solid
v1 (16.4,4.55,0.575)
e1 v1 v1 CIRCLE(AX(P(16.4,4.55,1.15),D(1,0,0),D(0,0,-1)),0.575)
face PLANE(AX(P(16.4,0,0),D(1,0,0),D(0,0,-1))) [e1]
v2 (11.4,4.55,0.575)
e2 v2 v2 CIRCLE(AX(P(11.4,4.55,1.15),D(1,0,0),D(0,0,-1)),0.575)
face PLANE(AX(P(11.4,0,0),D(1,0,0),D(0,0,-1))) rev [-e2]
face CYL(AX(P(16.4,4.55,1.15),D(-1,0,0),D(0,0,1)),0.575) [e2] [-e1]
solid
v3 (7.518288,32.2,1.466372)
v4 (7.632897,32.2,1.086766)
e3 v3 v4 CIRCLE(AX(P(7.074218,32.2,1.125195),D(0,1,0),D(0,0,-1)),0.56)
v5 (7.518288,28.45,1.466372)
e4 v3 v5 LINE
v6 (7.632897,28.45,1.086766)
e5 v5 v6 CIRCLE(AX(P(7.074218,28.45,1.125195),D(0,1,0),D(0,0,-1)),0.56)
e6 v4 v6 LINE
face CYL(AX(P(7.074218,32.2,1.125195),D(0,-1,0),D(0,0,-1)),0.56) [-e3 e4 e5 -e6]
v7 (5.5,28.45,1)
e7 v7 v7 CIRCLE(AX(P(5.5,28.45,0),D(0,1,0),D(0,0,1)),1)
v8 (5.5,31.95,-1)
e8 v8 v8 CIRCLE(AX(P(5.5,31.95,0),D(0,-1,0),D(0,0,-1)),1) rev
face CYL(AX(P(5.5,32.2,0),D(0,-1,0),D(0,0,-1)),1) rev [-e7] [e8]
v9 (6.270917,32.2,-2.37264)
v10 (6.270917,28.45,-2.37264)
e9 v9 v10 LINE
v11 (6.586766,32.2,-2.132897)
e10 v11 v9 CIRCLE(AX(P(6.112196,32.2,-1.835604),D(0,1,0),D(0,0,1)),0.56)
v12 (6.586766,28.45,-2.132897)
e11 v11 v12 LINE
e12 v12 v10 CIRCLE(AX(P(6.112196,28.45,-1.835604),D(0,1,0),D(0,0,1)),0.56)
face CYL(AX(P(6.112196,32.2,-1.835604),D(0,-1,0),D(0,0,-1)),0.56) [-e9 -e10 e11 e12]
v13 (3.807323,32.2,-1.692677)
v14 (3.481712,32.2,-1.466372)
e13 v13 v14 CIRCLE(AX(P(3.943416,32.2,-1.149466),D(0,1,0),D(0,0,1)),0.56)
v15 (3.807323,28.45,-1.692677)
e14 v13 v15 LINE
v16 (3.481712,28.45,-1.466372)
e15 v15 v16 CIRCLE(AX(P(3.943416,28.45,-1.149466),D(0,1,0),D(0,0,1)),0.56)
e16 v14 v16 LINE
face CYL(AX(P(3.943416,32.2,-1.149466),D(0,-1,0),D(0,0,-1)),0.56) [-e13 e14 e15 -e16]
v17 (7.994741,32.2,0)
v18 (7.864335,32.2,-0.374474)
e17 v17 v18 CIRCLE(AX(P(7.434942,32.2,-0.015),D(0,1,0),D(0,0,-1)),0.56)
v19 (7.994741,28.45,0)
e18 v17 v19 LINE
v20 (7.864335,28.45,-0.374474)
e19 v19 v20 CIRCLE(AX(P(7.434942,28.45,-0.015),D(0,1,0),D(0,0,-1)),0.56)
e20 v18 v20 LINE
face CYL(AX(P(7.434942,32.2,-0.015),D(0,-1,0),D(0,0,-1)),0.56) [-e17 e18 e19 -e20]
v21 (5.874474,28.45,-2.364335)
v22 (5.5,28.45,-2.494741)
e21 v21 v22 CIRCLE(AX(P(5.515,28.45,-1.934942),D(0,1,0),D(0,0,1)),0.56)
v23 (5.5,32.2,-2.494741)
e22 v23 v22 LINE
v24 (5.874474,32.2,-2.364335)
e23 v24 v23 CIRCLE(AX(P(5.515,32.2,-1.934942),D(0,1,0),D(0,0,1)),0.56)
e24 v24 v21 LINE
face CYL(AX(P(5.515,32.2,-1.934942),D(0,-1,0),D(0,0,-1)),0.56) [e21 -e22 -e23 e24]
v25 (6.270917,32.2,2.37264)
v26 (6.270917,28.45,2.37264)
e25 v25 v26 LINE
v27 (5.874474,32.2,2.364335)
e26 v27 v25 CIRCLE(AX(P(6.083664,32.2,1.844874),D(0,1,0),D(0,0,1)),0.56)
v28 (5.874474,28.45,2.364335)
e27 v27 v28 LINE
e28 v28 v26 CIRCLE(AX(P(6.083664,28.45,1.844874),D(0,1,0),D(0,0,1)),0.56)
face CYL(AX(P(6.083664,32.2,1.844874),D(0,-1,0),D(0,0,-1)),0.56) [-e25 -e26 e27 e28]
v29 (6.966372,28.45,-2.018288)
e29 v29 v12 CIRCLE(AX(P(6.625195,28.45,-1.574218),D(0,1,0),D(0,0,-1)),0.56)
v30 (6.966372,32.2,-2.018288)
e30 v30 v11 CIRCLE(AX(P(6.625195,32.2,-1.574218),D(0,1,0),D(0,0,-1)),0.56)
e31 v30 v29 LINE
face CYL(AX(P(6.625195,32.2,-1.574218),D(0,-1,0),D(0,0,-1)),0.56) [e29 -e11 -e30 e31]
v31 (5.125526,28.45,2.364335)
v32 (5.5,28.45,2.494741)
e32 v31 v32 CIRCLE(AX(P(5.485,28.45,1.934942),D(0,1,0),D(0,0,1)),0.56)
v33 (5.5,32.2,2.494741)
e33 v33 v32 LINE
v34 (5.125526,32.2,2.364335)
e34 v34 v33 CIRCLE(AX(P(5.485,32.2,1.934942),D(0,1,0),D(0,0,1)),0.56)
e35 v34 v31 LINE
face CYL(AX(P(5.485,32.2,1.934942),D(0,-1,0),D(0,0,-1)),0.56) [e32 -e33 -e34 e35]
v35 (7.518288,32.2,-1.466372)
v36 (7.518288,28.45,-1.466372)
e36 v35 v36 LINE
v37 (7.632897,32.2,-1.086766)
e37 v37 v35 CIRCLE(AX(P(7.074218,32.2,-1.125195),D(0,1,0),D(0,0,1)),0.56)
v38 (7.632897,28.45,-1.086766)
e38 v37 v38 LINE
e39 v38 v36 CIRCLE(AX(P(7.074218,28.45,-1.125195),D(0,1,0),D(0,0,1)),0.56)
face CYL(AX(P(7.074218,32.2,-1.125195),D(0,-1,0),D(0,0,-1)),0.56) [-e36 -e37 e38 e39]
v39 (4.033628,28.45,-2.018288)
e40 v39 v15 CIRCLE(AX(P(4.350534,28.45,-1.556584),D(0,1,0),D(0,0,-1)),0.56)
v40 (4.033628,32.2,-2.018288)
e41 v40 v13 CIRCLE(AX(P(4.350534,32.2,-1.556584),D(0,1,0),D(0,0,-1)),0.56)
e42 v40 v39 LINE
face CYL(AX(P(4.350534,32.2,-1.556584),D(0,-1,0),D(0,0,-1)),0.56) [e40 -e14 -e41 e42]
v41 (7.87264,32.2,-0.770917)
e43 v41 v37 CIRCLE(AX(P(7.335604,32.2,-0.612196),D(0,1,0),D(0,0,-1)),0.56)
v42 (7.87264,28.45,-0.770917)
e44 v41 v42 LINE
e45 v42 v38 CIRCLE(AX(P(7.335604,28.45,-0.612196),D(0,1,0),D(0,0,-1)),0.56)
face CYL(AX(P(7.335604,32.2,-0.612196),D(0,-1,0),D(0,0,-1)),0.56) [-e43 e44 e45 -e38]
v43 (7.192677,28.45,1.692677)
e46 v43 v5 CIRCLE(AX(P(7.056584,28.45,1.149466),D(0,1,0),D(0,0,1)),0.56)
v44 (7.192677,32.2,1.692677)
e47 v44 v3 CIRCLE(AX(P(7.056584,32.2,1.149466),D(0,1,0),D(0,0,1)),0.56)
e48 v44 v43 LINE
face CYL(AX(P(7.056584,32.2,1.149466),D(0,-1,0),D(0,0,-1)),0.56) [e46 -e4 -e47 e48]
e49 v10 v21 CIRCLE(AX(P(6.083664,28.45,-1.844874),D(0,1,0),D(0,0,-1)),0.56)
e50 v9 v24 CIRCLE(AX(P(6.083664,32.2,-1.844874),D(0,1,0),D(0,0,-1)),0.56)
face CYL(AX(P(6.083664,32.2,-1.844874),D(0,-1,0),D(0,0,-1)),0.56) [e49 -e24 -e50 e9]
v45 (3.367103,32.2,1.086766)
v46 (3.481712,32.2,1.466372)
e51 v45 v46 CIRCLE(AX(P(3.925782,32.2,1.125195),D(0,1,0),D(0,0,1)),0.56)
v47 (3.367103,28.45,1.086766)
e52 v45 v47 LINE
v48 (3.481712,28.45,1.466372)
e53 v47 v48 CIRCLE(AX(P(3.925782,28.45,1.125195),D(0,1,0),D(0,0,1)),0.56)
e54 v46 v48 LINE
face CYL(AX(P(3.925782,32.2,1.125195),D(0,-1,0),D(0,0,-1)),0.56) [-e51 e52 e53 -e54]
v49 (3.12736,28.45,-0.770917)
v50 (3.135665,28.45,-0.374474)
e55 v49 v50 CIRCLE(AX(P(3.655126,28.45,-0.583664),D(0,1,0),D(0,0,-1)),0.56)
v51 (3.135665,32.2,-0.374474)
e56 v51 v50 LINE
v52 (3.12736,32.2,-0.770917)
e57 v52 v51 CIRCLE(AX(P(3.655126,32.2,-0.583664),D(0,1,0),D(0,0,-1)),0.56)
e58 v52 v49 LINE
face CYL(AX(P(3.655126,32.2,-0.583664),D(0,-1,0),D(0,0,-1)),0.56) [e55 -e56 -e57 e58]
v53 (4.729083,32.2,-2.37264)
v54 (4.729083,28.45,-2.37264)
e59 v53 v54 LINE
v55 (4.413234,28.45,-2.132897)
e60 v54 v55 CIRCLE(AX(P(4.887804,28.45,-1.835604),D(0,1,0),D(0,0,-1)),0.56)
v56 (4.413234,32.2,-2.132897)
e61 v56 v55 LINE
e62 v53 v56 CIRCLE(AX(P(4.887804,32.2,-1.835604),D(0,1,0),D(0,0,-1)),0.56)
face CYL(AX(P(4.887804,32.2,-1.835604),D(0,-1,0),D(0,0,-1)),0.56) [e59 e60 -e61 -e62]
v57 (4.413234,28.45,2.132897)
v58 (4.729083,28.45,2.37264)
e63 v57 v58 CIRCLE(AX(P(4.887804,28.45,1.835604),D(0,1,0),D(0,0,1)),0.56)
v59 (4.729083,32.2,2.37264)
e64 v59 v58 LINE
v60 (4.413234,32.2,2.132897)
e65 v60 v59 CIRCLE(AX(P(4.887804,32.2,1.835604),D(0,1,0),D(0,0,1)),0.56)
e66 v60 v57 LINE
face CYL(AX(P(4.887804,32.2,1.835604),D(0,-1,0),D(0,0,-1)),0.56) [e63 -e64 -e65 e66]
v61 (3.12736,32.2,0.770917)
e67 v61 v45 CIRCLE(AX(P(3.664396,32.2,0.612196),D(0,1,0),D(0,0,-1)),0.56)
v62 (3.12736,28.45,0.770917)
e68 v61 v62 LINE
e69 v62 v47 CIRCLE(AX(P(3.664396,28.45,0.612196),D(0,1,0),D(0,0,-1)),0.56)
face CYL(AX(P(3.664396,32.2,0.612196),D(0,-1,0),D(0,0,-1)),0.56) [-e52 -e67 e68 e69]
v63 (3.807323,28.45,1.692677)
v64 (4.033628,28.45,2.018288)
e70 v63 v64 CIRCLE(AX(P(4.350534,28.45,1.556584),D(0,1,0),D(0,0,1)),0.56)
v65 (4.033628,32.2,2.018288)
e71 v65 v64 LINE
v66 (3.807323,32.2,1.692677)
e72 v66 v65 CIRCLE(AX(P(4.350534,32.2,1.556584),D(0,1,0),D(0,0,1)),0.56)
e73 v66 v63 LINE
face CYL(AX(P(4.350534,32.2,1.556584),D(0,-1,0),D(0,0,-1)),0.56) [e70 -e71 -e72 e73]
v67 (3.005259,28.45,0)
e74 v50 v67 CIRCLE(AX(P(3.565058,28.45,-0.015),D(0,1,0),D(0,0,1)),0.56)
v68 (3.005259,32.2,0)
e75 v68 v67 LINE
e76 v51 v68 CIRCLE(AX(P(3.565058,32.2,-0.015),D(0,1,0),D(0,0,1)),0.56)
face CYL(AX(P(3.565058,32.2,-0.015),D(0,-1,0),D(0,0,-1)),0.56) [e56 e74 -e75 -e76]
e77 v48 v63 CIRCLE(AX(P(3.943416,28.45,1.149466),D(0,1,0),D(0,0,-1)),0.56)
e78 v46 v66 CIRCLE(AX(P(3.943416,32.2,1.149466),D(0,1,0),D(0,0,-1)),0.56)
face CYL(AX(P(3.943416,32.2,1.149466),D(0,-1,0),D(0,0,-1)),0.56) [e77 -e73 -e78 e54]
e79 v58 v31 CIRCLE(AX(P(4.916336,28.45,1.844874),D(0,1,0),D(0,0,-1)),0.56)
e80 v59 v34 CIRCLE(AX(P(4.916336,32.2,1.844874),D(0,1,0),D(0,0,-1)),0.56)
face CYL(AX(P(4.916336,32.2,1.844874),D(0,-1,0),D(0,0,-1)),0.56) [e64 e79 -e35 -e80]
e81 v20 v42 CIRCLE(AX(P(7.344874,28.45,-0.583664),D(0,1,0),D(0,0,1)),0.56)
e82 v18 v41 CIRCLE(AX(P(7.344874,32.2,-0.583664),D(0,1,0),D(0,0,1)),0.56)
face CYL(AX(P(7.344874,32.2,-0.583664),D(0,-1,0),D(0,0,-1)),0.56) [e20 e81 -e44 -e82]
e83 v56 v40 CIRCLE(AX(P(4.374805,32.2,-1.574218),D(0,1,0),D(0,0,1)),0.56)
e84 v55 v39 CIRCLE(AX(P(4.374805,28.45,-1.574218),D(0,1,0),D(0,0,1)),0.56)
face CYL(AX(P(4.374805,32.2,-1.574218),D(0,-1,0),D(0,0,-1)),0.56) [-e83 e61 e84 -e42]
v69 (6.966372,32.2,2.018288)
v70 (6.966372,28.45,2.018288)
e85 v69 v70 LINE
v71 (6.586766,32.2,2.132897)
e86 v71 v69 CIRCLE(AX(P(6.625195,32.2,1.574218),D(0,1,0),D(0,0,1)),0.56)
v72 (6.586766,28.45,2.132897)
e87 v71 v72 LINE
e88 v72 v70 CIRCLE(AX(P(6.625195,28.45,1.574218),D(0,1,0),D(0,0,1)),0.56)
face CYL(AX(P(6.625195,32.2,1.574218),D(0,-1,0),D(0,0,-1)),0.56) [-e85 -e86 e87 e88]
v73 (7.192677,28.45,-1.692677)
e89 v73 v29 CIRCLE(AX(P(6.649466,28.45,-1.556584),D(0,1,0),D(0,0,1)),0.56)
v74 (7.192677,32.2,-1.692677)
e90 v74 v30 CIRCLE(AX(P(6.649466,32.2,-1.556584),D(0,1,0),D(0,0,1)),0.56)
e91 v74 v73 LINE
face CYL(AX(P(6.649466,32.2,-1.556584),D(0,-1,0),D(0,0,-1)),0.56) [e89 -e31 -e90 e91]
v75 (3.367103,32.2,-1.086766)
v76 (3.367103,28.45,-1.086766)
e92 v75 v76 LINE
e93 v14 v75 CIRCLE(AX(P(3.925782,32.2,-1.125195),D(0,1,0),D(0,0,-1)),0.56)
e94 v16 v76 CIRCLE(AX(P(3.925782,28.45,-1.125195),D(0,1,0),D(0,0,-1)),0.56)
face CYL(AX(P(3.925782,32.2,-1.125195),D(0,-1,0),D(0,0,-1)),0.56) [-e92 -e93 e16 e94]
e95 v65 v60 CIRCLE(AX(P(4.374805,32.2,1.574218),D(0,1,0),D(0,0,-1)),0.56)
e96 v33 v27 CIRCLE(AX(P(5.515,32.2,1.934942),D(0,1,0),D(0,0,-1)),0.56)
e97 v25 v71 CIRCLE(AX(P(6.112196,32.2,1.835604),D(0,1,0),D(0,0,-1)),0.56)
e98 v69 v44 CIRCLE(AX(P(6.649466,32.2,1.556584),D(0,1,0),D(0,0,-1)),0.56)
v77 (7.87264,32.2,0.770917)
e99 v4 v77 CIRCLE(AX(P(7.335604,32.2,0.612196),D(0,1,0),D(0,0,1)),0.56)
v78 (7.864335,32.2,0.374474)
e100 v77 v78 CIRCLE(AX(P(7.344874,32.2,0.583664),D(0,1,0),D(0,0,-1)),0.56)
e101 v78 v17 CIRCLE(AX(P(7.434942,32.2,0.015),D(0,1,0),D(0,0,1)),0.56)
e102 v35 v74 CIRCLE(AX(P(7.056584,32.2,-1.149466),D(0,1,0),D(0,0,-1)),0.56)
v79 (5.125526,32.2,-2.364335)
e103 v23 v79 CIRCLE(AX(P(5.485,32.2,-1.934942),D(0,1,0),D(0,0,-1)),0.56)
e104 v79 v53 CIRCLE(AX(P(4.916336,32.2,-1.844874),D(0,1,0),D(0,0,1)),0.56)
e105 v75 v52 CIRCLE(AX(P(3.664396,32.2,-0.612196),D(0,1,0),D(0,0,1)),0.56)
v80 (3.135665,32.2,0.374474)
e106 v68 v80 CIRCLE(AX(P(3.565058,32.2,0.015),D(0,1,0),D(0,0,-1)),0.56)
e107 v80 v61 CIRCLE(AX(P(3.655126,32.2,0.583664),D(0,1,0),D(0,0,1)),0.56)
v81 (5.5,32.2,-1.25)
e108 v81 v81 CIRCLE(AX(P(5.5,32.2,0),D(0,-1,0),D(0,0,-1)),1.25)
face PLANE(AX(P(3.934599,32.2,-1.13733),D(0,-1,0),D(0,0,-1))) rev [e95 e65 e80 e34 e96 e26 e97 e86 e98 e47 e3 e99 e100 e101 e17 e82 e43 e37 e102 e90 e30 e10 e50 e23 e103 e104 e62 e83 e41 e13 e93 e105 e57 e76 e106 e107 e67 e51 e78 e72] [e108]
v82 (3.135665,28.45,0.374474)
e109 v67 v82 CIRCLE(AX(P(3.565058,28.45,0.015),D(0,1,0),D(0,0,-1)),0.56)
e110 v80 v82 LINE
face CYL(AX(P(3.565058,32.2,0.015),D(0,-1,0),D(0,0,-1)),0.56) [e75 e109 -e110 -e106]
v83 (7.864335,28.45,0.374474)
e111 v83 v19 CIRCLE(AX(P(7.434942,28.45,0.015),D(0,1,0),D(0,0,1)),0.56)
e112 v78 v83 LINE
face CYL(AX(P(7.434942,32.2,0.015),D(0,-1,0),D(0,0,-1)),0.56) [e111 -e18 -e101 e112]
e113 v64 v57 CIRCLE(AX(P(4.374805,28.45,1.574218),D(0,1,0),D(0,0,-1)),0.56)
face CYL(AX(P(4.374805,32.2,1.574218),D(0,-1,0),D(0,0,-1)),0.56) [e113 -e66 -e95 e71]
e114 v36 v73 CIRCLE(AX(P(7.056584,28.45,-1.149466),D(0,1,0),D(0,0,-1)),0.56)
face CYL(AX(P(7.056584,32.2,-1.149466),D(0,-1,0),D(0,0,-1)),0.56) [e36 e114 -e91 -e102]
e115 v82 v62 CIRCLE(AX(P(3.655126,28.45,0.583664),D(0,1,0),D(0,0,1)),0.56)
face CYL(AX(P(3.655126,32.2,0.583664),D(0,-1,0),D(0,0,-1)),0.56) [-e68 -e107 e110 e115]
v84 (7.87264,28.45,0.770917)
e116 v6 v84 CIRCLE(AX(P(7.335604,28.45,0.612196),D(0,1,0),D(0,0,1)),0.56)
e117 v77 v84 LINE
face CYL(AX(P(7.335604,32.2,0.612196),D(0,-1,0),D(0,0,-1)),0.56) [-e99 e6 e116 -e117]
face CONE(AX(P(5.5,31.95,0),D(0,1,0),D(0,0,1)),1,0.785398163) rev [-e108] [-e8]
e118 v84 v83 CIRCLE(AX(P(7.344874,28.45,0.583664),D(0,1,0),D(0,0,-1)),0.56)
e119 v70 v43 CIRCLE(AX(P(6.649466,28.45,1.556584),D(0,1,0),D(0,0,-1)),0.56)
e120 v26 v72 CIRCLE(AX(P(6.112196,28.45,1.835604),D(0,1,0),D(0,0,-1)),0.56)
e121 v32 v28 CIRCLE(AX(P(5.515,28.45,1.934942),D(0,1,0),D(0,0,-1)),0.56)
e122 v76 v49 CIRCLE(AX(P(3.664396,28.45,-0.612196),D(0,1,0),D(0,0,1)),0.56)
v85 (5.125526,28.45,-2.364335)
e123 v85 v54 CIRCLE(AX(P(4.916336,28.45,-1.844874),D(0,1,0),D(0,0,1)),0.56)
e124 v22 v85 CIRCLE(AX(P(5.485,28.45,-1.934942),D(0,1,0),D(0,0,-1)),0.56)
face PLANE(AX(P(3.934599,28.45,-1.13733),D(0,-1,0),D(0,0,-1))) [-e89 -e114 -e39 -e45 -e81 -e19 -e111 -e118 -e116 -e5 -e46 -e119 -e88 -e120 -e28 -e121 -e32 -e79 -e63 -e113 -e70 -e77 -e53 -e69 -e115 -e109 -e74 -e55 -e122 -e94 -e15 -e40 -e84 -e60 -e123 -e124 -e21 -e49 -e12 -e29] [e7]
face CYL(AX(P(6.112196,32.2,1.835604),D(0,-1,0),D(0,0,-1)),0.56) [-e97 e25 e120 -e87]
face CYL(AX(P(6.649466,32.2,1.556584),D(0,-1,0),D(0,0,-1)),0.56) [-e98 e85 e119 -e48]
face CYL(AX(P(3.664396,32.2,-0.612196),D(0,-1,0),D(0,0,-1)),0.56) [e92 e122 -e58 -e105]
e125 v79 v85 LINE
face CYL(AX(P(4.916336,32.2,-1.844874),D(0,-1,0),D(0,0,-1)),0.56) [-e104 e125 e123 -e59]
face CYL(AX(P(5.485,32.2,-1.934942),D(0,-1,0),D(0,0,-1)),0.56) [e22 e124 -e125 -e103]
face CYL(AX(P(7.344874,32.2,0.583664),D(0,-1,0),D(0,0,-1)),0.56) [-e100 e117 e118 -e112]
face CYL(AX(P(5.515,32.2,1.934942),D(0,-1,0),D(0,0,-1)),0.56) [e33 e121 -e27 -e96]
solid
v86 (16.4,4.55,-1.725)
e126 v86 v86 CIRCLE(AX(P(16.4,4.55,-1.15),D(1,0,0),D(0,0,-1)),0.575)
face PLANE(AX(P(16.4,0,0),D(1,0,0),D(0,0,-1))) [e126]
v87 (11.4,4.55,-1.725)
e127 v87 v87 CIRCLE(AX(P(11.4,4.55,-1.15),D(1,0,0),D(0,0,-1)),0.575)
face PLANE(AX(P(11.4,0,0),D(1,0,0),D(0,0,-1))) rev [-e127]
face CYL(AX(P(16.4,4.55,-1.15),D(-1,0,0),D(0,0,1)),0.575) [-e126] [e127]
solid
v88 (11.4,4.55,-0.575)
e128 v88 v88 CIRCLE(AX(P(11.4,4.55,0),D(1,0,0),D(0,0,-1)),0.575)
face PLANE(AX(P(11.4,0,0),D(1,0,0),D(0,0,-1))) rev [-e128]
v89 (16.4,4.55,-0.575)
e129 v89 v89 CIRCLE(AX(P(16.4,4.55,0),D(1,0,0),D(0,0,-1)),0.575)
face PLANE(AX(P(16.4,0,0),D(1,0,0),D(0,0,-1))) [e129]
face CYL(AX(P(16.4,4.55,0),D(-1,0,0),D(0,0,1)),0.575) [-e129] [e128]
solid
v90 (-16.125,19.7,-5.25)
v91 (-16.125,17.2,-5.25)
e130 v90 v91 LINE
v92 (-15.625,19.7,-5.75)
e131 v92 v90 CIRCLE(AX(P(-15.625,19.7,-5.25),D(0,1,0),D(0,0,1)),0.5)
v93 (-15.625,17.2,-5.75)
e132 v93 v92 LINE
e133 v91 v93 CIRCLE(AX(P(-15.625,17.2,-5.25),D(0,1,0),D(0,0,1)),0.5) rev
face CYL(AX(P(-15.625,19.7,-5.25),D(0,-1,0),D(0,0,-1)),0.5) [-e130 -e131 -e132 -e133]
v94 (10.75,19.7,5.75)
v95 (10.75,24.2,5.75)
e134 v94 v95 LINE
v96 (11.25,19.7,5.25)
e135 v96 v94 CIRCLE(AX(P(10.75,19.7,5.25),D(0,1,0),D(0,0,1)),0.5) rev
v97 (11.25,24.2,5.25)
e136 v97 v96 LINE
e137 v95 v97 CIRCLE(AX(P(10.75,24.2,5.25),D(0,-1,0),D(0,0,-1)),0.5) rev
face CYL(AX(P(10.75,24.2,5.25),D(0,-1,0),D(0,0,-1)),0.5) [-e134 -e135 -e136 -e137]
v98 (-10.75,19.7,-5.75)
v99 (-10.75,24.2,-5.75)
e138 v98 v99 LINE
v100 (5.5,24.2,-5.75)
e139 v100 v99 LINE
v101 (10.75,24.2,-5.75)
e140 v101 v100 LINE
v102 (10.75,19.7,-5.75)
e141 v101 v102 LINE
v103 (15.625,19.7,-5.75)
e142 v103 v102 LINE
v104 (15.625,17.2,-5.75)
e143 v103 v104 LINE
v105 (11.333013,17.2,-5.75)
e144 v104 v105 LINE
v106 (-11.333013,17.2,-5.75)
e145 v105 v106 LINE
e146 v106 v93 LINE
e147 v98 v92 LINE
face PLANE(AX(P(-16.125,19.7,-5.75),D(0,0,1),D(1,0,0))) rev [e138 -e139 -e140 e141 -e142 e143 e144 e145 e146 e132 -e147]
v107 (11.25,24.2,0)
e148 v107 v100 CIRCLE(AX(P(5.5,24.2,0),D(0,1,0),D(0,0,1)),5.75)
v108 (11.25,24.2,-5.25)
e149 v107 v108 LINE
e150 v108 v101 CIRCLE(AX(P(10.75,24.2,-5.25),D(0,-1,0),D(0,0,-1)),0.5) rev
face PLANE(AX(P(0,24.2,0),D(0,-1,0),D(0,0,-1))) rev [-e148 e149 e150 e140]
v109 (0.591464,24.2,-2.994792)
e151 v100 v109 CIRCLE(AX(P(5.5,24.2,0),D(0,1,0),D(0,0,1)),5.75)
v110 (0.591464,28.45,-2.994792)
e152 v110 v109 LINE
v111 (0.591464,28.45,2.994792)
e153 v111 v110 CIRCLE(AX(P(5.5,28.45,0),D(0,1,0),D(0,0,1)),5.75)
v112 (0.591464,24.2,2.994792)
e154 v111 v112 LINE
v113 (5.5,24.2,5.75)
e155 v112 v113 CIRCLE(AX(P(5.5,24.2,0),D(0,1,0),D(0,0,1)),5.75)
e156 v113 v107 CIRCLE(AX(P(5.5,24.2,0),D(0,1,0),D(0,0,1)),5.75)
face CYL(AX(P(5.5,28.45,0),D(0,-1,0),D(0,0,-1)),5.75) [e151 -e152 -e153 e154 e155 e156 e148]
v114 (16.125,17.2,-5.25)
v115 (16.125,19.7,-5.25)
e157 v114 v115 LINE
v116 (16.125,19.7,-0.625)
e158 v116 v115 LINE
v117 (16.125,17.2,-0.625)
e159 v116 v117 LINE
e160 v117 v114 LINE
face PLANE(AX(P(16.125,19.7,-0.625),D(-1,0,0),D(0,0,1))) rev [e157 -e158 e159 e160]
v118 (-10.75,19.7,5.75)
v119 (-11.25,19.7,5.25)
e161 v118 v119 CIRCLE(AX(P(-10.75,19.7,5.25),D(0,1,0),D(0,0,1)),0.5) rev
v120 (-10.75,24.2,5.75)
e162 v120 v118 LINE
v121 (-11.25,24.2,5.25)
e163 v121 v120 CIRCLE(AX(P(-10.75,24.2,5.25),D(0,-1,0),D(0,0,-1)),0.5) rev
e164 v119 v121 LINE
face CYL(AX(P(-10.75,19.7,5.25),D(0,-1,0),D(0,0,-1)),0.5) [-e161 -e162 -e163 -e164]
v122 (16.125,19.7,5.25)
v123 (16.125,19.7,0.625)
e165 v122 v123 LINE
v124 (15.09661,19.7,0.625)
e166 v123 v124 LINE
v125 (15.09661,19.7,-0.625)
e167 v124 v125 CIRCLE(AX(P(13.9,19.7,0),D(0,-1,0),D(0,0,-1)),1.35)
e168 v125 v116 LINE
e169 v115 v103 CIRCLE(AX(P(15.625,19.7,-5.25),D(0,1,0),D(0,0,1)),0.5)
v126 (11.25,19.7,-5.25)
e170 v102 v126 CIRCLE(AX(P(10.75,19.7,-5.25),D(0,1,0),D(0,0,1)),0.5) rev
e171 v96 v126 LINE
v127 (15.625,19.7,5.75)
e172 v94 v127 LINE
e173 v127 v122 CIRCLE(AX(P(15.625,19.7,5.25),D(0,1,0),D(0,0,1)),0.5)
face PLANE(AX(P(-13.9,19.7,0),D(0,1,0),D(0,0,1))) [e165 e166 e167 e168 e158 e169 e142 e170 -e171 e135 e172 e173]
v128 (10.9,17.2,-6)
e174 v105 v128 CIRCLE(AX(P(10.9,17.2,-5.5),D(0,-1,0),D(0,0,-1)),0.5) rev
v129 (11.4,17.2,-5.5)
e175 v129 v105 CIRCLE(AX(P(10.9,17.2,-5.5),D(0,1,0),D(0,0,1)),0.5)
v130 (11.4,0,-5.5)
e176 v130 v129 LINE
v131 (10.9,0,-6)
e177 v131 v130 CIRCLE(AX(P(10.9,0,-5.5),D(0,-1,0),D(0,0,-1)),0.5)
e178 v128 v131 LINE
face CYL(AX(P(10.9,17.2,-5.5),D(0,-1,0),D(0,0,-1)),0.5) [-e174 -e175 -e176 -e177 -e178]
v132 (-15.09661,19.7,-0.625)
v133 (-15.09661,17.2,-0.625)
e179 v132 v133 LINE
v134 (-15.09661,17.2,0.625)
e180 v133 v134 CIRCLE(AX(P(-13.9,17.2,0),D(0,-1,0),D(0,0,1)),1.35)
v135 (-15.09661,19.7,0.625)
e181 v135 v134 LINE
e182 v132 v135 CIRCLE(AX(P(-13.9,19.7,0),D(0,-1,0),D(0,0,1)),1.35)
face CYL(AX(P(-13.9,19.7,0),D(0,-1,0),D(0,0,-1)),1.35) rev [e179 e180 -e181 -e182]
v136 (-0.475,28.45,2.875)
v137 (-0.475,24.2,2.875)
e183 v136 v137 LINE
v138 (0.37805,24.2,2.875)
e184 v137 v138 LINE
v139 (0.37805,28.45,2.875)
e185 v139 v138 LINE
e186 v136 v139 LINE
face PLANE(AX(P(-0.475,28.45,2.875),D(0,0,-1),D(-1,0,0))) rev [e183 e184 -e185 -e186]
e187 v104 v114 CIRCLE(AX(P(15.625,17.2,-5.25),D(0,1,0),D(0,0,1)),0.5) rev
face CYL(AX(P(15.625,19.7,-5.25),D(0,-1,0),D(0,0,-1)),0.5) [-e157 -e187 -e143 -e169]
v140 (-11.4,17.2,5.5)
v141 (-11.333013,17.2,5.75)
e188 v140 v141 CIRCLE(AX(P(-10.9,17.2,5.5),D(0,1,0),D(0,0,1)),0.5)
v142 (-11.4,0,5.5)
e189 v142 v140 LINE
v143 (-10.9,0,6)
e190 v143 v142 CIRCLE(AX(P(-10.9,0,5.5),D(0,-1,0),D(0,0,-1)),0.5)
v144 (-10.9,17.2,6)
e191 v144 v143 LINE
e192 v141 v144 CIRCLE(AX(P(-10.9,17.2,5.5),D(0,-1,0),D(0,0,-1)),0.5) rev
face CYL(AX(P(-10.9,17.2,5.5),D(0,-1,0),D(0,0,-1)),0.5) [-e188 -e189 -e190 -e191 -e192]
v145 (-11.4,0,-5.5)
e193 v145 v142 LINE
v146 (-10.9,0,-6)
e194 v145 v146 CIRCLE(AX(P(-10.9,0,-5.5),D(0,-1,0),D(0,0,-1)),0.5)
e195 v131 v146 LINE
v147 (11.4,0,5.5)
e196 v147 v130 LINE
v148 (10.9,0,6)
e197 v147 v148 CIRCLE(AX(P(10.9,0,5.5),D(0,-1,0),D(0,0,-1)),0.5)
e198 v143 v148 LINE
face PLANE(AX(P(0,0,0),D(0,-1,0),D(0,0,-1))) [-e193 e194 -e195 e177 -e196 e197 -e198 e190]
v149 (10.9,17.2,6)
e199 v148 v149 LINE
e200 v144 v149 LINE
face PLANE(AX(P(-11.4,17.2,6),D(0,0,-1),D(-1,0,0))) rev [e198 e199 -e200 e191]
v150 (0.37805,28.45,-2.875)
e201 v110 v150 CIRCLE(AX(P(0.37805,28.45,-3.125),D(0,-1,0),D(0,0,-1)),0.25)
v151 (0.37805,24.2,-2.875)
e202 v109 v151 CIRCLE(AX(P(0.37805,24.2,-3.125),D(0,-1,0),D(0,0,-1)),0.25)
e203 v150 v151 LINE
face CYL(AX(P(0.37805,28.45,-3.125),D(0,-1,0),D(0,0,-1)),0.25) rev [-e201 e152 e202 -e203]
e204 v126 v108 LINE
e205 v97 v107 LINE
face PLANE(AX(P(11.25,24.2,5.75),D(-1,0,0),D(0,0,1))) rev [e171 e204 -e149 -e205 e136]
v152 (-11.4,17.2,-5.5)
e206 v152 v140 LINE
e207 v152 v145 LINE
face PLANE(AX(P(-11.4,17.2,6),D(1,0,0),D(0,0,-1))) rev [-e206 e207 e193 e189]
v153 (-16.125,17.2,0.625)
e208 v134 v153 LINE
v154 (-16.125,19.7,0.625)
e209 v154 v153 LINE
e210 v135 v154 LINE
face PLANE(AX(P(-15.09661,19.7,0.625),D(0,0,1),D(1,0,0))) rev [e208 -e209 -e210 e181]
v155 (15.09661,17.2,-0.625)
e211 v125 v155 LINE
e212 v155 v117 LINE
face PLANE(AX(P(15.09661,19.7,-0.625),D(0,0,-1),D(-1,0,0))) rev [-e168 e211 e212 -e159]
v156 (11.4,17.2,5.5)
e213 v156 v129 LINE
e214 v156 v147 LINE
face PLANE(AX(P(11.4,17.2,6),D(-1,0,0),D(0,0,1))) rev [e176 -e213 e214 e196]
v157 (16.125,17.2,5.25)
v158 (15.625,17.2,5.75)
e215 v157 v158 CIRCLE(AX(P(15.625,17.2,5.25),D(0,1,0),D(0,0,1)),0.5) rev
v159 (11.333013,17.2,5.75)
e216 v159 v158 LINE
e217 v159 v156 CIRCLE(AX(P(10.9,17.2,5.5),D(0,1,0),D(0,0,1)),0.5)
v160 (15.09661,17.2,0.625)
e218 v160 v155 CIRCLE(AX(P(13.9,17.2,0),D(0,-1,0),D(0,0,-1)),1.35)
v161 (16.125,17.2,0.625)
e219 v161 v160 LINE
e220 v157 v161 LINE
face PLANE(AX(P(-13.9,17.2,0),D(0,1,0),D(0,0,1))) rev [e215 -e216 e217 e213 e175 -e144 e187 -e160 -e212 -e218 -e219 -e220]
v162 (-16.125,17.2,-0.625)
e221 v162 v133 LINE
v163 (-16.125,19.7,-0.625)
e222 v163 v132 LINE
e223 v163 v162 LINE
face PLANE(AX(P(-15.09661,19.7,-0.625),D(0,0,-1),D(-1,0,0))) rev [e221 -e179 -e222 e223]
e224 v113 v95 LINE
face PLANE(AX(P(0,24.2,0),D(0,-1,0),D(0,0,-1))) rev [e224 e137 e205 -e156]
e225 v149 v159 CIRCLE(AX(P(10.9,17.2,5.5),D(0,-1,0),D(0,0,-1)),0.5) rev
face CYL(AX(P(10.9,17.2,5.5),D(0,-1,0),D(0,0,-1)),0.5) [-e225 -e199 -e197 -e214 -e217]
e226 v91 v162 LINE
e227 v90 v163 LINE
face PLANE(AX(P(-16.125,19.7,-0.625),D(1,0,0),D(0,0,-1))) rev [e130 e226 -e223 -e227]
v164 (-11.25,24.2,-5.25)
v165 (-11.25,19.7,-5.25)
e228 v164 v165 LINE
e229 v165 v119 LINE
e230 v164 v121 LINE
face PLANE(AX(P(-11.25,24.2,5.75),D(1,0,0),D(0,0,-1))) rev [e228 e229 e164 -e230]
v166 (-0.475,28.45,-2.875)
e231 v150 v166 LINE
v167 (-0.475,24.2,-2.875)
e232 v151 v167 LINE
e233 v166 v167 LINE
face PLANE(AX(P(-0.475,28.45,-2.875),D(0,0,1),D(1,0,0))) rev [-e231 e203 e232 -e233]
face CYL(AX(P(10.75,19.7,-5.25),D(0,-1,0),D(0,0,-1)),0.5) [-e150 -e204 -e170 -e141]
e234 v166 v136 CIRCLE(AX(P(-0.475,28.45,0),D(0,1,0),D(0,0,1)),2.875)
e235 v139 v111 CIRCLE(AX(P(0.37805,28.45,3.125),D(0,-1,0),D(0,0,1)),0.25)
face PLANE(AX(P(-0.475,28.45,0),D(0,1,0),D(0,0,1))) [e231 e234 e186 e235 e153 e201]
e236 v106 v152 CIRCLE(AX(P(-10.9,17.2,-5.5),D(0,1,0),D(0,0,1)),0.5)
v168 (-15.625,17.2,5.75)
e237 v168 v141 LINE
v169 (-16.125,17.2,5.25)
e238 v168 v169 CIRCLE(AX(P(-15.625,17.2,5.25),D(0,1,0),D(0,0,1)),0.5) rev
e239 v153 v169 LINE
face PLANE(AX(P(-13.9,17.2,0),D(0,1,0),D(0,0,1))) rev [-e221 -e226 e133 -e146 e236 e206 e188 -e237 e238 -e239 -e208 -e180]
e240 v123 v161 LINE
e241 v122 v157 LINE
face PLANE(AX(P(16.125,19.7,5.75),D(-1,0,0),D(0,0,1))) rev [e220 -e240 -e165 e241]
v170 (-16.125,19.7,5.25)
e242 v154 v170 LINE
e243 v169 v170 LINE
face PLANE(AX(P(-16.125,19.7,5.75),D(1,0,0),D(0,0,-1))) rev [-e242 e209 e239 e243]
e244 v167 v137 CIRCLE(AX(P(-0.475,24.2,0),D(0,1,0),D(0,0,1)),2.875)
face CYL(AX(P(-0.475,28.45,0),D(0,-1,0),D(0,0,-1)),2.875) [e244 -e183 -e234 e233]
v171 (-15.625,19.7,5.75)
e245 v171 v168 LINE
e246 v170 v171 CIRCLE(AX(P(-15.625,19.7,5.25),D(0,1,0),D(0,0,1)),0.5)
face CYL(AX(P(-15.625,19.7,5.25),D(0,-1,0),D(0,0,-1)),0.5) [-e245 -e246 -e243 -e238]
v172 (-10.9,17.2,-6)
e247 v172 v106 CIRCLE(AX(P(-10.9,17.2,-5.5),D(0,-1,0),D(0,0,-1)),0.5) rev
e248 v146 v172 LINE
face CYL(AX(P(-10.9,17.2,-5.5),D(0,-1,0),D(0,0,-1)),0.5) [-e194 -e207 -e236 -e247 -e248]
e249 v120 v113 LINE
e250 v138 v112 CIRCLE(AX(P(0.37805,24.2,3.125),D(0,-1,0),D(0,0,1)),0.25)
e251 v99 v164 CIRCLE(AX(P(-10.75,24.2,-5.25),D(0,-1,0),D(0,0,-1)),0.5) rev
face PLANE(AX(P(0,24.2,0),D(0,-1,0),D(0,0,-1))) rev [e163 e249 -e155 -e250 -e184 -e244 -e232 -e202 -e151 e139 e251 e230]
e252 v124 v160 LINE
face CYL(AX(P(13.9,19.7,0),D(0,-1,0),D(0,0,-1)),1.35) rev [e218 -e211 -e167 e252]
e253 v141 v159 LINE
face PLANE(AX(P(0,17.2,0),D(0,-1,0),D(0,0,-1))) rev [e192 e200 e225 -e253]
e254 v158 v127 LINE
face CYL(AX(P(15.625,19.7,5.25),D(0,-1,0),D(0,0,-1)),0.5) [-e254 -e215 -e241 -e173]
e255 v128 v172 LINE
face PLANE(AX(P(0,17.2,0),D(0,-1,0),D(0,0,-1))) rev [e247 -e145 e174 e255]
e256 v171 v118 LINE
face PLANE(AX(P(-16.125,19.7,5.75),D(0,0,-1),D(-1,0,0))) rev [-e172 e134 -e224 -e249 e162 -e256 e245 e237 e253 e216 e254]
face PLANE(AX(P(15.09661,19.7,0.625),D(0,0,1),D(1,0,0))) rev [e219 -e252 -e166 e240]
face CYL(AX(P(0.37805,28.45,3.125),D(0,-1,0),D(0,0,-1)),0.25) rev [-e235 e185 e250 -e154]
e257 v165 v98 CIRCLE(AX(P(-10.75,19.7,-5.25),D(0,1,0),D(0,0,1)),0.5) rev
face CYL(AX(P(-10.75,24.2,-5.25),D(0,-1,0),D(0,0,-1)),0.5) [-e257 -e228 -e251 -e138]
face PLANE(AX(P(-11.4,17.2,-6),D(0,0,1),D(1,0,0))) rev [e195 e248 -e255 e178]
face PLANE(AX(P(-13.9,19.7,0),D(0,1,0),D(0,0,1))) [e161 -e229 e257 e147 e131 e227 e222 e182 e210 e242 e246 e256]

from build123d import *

# Parameters (mm, degrees)
SKETCH1_W           = 22.8
SKETCH1_H           = 12
BOSS_EXTRUDE1_DEPTH = 17.2
BOSS_EXTRUDE2_DEPTH = 2.5
SKETCH3_W           = 22.5
SKETCH3_H           = 11.5
BOSS_EXTRUDE3_DEPTH = 4.5
BOSS_EXTRUDE4_DEPTH = 4.25
SKETCH5_R           = 1
BOSS_EXTRUDE5_DEPTH = 3.75
CHAMFER1_SIZE       = 0.25
FILLET1_R           = 0.5
SKETCH7_R           = 0.575
BOSS_EXTRUDE6_DEPTH = 5
SKETCH7_3_R         = 0.575
BOSS_EXTRUDE7_DEPTH = 5
SKETCH7_4_R         = 0.575
BOSS_EXTRUDE8_DEPTH = 5


with BuildPart() as part:
    # Sketch1 → Boss-Extrude1 (new body)
    with BuildSketch(Plane(origin=(0, 0, 0), x_dir=(1, 0, 0), z_dir=(0, 1, 0))):
        Rectangle(SKETCH1_W, SKETCH1_H)
    extrude(amount=BOSS_EXTRUDE1_DEPTH)

    # Sketch2 → Boss-Extrude2 (add)
    with BuildSketch(Plane(origin=(0, 17.2, 0), x_dir=(1, 0, 0), z_dir=(0, 1, 0))):
        with BuildLine():
            Line((-16.125, -5.75), (16.125, -5.75))
            Line((16.125, -5.75), (16.125, -0.625))
            Line((16.125, -0.625), (15.096609794, -0.625))
            ThreePointArc((15.096609794, -0.625), (12.55, 0), (15.096609794, 0.625))
            Line((15.096609794, 0.625), (16.125, 0.625))
            Line((16.125, 0.625), (16.125, 5.75))
            Line((16.125, 5.75), (-16.125, 5.75))
            Line((-16.125, 5.75), (-16.125, 0.625))
            Line((-16.125, 0.625), (-15.096609794, 0.625))
            ThreePointArc((-15.096609794, 0.625), (-12.55, 0), (-15.096609794, -0.625))
            Line((-15.096609794, -0.625), (-16.125, -0.625))
            Line((-16.125, -0.625), (-16.125, -5.75))
        make_face()
    extrude(amount=BOSS_EXTRUDE2_DEPTH)

    # Sketch3 → Boss-Extrude3 (add)
    with BuildSketch(Plane(origin=(0, 19.7, 0), x_dir=(1, 0, 0), z_dir=(0, 1, 0))):
        Rectangle(SKETCH3_W, SKETCH3_H)
    extrude(amount=BOSS_EXTRUDE3_DEPTH)

    # Sketch4 → Boss-Extrude4 (add)
    with BuildSketch(Plane(origin=(0, 24.2, 0), x_dir=(1, 0, 0), z_dir=(0, 1, 0))):
        with BuildLine():
            Line((-0.475, 2.875), (0.378049688, 2.875))
            ThreePointArc((0.378049688, 2.875), (0.500417814, 2.906995317), (0.591464284, 2.994791667))
            ThreePointArc((0.591464284, 2.994791667), (11.25, 0), (0.591464284, -2.994791667))
            ThreePointArc((0.591464284, -2.994791667), (0.500417814, -2.906995317), (0.378049688, -2.875))
            Line((0.378049688, -2.875), (-0.475, -2.875))
            ThreePointArc((-0.475, -2.875), (-3.35, 0), (-0.475, 2.875))
        make_face()
    extrude(amount=BOSS_EXTRUDE4_DEPTH)

    # Fillet1
    # the kernel refuses this fillet: 0.5 mm, written as the material it takes off along each edge
    with BuildSketch(Plane(origin=(16.125, 15.95, -5.75), x_dir=(-1, 0, 0), z_dir=(0, 1, 0)), Plane(origin=(-16.125, 15.95, 5.75), x_dir=(1, 0, 0), z_dir=(0, 1, 0))) as fillet1_piece_1:
        with BuildLine():
            CenterArc((FILLET1_R, FILLET1_R), FILLET1_R, 180, 90)
            Line((0, FILLET1_R), (0, 0))
            Line((0, 0), (FILLET1_R, 0))
        make_face()
    extrude(amount=5, mode=Mode.SUBTRACT)
    with BuildSketch(Plane(origin=(-16.125, 15.95, -5.75), x_dir=(1, 0, 0), z_dir=(0, 1, 0)), Plane(origin=(16.125, 15.95, 5.75), x_dir=(-1, 0, 0), z_dir=(0, 1, 0))) as fillet1_piece_2:
        with BuildLine():
            CenterArc((FILLET1_R, -FILLET1_R), FILLET1_R, 90, 90)
            Line((0, -FILLET1_R), (0, 0))
            Line((0, 0), (FILLET1_R, 0))
        make_face()
    extrude(amount=5, mode=Mode.SUBTRACT)
    with BuildSketch(Plane(origin=(11.25, 19.7, 5.75), x_dir=(-1, 0, 0), z_dir=(0, 1, 0)), Plane(origin=(-11.25, 19.7, -5.75), x_dir=(1, 0, 0), z_dir=(0, 1, 0))) as fillet1_piece_3:
        with BuildLine():
            CenterArc((FILLET1_R, -FILLET1_R), FILLET1_R, 90, 90)
            Line((0, -FILLET1_R), (0, 0))
            Line((0, 0), (FILLET1_R, 0))
        make_face()
    extrude(amount=5.75, mode=Mode.SUBTRACT)
    with BuildSketch(Plane(origin=(11.25, 19.7, -5.75), x_dir=(-1, 0, 0), z_dir=(0, 1, 0)), Plane(origin=(-11.25, 19.7, 5.75), x_dir=(1, 0, 0), z_dir=(0, 1, 0))) as fillet1_piece_4:
        with BuildLine():
            CenterArc((FILLET1_R, FILLET1_R), FILLET1_R, 180, 90)
            Line((0, FILLET1_R), (0, 0))
            Line((0, 0), (FILLET1_R, 0))
        make_face()
    extrude(amount=5.75, mode=Mode.SUBTRACT)
    with BuildSketch(Plane(origin=(11.4, -1.25, 6), x_dir=(-1, 0, 0), z_dir=(0, 1, 0)), Plane(origin=(11.4, -1.25, -6), x_dir=(0, 0, 1), z_dir=(0, 1, 0))) as fillet1_piece_5:
        with BuildLine():
            CenterArc((FILLET1_R, -FILLET1_R), FILLET1_R, 90, 90)
            Line((0, -FILLET1_R), (0, 0))
            Line((0, 0), (FILLET1_R, 0))
        make_face()
    extrude(amount=18.45, mode=Mode.SUBTRACT)
    with BuildSketch(Plane(origin=(-11.4, -1.25, 6), x_dir=(1, 0, 0), z_dir=(0, 1, 0)), Plane(origin=(-11.4, -1.25, -6), x_dir=(0, 0, 1), z_dir=(0, 1, 0))) as fillet1_piece_6:
        with BuildLine():
            CenterArc((FILLET1_R, FILLET1_R), FILLET1_R, 180, 90)
            Line((0, FILLET1_R), (0, 0))
            Line((0, 0), (FILLET1_R, 0))
        make_face()
    extrude(amount=18.45, mode=Mode.SUBTRACT)


with BuildPart() as body_2:
    # Sketch5 → Boss-Extrude5 (new body)
    with BuildSketch(Plane(origin=(0, 28.45, 0), x_dir=(1, 0, 0), z_dir=(0, 1, 0))):
        with BuildLine():
            ThreePointArc((3.135664935, 0.374473886), (3.036207488, 0.199165651), (3.005259069, 0))
            ThreePointArc((3.005259069, 0), (3.036207488, -0.199165651), (3.135664935, -0.374473886))
            ThreePointArc((3.135664935, -0.374473886), (3.095248505, -0.571935967), (3.127360381, -0.770917344))
            ThreePointArc((3.127360381, -0.770917344), (3.218339647, -0.950771547), (3.367102524, -1.086765545))
            ThreePointArc((3.367102524, -1.086765545), (3.389683354, -1.287052507), (3.481712191, -1.466371927))
            ThreePointArc((3.481712191, -1.466371927), (3.623816619, -1.6093093), (3.807322979, -1.692677021))
            ThreePointArc((3.807322979, -1.692677021), (3.8906907, -1.876183381), (4.033628073, -2.018287809))
            ThreePointArc((4.033628073, -2.018287809), (4.212947493, -2.110316646), (4.413234455, -2.132897476))
            ThreePointArc((4.413234455, -2.132897476), (4.549228453, -2.281660353), (4.729082656, -2.372639619))
            ThreePointArc((4.729082656, -2.372639619), (4.928064033, -2.404751495), (5.125526114, -2.364335065))
            ThreePointArc((5.125526114, -2.364335065), (5.300834349, -2.463792512), (5.5, -2.494740931))
            ThreePointArc((5.5, -2.494740931), (5.699165651, -2.463792512), (5.874473886, -2.364335065))
            ThreePointArc((5.874473886, -2.364335065), (6.071935967, -2.404751495), (6.270917344, -2.372639619))
            ThreePointArc((6.270917344, -2.372639619), (6.450771547, -2.281660353), (6.586765545, -2.132897476))
            ThreePointArc((6.586765545, -2.132897476), (6.787052507, -2.110316646), (6.966371927, -2.018287809))
            ThreePointArc((6.966371927, -2.018287809), (7.1093093, -1.876183381), (7.192677021, -1.692677021))
            ThreePointArc((7.192677021, -1.692677021), (7.376183381, -1.6093093), (7.518287809, -1.466371927))
            ThreePointArc((7.518287809, -1.466371927), (7.610316646, -1.287052507), (7.632897476, -1.086765545))
            ThreePointArc((7.632897476, -1.086765545), (7.781660353, -0.950771547), (7.872639619, -0.770917344))
            ThreePointArc((7.872639619, -0.770917344), (7.904751495, -0.571935967), (7.864335065, -0.374473886))
            ThreePointArc((7.864335065, -0.374473886), (7.963792512, -0.199165651), (7.994740931, 0))
            ThreePointArc((7.994740931, 0), (7.963792512, 0.199165651), (7.864335065, 0.374473886))
            ThreePointArc((7.864335065, 0.374473886), (7.904751495, 0.571935967), (7.872639619, 0.770917344))
            ThreePointArc((7.872639619, 0.770917344), (7.781660353, 0.950771547), (7.632897476, 1.086765545))
            ThreePointArc((7.632897476, 1.086765545), (7.610316646, 1.287052507), (7.518287809, 1.466371927))
            ThreePointArc((7.518287809, 1.466371927), (7.376183381, 1.6093093), (7.192677021, 1.692677021))
            ThreePointArc((7.192677021, 1.692677021), (7.1093093, 1.876183381), (6.966371927, 2.018287809))
            ThreePointArc((6.966371927, 2.018287809), (6.787052507, 2.110316646), (6.586765545, 2.132897476))
            ThreePointArc((6.586765545, 2.132897476), (6.450771547, 2.281660353), (6.270917344, 2.372639619))
            ThreePointArc((6.270917344, 2.372639619), (6.071935967, 2.404751495), (5.874473886, 2.364335065))
            ThreePointArc((5.874473886, 2.364335065), (5.699165651, 2.463792512), (5.5, 2.494740931))
            ThreePointArc((5.5, 2.494740931), (5.300834349, 2.463792512), (5.125526114, 2.364335065))
            ThreePointArc((5.125526114, 2.364335065), (4.928064033, 2.404751495), (4.729082656, 2.372639619))
            ThreePointArc((4.729082656, 2.372639619), (4.549228453, 2.281660353), (4.413234455, 2.132897476))
            ThreePointArc((4.413234455, 2.132897476), (4.212947493, 2.110316646), (4.033628073, 2.018287809))
            ThreePointArc((4.033628073, 2.018287809), (3.8906907, 1.876183381), (3.807322979, 1.692677021))
            ThreePointArc((3.807322979, 1.692677021), (3.623816619, 1.6093093), (3.481712191, 1.466371927))
            ThreePointArc((3.481712191, 1.466371927), (3.389683354, 1.287052507), (3.367102524, 1.086765545))
            ThreePointArc((3.367102524, 1.086765545), (3.218339647, 0.950771547), (3.127360381, 0.770917344))
            ThreePointArc((3.127360381, 0.770917344), (3.095248505, 0.571935967), (3.135664935, 0.374473886))
        make_face()
        with Locations(Location((5.5, 0, 0), (0, 0, 270))):
            Circle(SKETCH5_R, mode=Mode.SUBTRACT)
    extrude(amount=BOSS_EXTRUDE5_DEPTH)

    # Chamfer1
    chamfer1_edges = [body_2.edges().sort_by_distance(p)[0] for p in [
        (5.5, 32.2, -1),
    ]]
    chamfer(chamfer1_edges, length=CHAMFER1_SIZE)


with BuildPart() as body_3:
    # Sketch7 → Boss-Extrude6 (new body)
    with BuildSketch(Plane(origin=(11.4, 0, 0), x_dir=(0, 0, -1), z_dir=(1, 0, 0))):
        with Locations((-1.15, 4.55)):
            Circle(SKETCH7_R)
    extrude(amount=BOSS_EXTRUDE6_DEPTH)


with BuildPart() as body_4:
    # Sketch7<3> → Boss-Extrude7 (new body)
    with BuildSketch(Plane(origin=(11.4, 0, 0), x_dir=(0, 0, -1), z_dir=(1, 0, 0))):
        with Locations((0, 4.55)):
            Circle(SKETCH7_3_R)
    extrude(amount=BOSS_EXTRUDE7_DEPTH)


with BuildPart() as body_5:
    # Sketch7<4> → Boss-Extrude8 (new body)
    with BuildSketch(Plane(origin=(11.4, 0, 0), x_dir=(0, 0, -1), z_dir=(1, 0, 0))):
        with Locations((1.15, 4.55)):
            Circle(SKETCH7_4_R)
    extrude(amount=BOSS_EXTRUDE8_DEPTH)


solid = Compound([part.part, body_2.part, body_3.part, body_4.part, body_5.part])
